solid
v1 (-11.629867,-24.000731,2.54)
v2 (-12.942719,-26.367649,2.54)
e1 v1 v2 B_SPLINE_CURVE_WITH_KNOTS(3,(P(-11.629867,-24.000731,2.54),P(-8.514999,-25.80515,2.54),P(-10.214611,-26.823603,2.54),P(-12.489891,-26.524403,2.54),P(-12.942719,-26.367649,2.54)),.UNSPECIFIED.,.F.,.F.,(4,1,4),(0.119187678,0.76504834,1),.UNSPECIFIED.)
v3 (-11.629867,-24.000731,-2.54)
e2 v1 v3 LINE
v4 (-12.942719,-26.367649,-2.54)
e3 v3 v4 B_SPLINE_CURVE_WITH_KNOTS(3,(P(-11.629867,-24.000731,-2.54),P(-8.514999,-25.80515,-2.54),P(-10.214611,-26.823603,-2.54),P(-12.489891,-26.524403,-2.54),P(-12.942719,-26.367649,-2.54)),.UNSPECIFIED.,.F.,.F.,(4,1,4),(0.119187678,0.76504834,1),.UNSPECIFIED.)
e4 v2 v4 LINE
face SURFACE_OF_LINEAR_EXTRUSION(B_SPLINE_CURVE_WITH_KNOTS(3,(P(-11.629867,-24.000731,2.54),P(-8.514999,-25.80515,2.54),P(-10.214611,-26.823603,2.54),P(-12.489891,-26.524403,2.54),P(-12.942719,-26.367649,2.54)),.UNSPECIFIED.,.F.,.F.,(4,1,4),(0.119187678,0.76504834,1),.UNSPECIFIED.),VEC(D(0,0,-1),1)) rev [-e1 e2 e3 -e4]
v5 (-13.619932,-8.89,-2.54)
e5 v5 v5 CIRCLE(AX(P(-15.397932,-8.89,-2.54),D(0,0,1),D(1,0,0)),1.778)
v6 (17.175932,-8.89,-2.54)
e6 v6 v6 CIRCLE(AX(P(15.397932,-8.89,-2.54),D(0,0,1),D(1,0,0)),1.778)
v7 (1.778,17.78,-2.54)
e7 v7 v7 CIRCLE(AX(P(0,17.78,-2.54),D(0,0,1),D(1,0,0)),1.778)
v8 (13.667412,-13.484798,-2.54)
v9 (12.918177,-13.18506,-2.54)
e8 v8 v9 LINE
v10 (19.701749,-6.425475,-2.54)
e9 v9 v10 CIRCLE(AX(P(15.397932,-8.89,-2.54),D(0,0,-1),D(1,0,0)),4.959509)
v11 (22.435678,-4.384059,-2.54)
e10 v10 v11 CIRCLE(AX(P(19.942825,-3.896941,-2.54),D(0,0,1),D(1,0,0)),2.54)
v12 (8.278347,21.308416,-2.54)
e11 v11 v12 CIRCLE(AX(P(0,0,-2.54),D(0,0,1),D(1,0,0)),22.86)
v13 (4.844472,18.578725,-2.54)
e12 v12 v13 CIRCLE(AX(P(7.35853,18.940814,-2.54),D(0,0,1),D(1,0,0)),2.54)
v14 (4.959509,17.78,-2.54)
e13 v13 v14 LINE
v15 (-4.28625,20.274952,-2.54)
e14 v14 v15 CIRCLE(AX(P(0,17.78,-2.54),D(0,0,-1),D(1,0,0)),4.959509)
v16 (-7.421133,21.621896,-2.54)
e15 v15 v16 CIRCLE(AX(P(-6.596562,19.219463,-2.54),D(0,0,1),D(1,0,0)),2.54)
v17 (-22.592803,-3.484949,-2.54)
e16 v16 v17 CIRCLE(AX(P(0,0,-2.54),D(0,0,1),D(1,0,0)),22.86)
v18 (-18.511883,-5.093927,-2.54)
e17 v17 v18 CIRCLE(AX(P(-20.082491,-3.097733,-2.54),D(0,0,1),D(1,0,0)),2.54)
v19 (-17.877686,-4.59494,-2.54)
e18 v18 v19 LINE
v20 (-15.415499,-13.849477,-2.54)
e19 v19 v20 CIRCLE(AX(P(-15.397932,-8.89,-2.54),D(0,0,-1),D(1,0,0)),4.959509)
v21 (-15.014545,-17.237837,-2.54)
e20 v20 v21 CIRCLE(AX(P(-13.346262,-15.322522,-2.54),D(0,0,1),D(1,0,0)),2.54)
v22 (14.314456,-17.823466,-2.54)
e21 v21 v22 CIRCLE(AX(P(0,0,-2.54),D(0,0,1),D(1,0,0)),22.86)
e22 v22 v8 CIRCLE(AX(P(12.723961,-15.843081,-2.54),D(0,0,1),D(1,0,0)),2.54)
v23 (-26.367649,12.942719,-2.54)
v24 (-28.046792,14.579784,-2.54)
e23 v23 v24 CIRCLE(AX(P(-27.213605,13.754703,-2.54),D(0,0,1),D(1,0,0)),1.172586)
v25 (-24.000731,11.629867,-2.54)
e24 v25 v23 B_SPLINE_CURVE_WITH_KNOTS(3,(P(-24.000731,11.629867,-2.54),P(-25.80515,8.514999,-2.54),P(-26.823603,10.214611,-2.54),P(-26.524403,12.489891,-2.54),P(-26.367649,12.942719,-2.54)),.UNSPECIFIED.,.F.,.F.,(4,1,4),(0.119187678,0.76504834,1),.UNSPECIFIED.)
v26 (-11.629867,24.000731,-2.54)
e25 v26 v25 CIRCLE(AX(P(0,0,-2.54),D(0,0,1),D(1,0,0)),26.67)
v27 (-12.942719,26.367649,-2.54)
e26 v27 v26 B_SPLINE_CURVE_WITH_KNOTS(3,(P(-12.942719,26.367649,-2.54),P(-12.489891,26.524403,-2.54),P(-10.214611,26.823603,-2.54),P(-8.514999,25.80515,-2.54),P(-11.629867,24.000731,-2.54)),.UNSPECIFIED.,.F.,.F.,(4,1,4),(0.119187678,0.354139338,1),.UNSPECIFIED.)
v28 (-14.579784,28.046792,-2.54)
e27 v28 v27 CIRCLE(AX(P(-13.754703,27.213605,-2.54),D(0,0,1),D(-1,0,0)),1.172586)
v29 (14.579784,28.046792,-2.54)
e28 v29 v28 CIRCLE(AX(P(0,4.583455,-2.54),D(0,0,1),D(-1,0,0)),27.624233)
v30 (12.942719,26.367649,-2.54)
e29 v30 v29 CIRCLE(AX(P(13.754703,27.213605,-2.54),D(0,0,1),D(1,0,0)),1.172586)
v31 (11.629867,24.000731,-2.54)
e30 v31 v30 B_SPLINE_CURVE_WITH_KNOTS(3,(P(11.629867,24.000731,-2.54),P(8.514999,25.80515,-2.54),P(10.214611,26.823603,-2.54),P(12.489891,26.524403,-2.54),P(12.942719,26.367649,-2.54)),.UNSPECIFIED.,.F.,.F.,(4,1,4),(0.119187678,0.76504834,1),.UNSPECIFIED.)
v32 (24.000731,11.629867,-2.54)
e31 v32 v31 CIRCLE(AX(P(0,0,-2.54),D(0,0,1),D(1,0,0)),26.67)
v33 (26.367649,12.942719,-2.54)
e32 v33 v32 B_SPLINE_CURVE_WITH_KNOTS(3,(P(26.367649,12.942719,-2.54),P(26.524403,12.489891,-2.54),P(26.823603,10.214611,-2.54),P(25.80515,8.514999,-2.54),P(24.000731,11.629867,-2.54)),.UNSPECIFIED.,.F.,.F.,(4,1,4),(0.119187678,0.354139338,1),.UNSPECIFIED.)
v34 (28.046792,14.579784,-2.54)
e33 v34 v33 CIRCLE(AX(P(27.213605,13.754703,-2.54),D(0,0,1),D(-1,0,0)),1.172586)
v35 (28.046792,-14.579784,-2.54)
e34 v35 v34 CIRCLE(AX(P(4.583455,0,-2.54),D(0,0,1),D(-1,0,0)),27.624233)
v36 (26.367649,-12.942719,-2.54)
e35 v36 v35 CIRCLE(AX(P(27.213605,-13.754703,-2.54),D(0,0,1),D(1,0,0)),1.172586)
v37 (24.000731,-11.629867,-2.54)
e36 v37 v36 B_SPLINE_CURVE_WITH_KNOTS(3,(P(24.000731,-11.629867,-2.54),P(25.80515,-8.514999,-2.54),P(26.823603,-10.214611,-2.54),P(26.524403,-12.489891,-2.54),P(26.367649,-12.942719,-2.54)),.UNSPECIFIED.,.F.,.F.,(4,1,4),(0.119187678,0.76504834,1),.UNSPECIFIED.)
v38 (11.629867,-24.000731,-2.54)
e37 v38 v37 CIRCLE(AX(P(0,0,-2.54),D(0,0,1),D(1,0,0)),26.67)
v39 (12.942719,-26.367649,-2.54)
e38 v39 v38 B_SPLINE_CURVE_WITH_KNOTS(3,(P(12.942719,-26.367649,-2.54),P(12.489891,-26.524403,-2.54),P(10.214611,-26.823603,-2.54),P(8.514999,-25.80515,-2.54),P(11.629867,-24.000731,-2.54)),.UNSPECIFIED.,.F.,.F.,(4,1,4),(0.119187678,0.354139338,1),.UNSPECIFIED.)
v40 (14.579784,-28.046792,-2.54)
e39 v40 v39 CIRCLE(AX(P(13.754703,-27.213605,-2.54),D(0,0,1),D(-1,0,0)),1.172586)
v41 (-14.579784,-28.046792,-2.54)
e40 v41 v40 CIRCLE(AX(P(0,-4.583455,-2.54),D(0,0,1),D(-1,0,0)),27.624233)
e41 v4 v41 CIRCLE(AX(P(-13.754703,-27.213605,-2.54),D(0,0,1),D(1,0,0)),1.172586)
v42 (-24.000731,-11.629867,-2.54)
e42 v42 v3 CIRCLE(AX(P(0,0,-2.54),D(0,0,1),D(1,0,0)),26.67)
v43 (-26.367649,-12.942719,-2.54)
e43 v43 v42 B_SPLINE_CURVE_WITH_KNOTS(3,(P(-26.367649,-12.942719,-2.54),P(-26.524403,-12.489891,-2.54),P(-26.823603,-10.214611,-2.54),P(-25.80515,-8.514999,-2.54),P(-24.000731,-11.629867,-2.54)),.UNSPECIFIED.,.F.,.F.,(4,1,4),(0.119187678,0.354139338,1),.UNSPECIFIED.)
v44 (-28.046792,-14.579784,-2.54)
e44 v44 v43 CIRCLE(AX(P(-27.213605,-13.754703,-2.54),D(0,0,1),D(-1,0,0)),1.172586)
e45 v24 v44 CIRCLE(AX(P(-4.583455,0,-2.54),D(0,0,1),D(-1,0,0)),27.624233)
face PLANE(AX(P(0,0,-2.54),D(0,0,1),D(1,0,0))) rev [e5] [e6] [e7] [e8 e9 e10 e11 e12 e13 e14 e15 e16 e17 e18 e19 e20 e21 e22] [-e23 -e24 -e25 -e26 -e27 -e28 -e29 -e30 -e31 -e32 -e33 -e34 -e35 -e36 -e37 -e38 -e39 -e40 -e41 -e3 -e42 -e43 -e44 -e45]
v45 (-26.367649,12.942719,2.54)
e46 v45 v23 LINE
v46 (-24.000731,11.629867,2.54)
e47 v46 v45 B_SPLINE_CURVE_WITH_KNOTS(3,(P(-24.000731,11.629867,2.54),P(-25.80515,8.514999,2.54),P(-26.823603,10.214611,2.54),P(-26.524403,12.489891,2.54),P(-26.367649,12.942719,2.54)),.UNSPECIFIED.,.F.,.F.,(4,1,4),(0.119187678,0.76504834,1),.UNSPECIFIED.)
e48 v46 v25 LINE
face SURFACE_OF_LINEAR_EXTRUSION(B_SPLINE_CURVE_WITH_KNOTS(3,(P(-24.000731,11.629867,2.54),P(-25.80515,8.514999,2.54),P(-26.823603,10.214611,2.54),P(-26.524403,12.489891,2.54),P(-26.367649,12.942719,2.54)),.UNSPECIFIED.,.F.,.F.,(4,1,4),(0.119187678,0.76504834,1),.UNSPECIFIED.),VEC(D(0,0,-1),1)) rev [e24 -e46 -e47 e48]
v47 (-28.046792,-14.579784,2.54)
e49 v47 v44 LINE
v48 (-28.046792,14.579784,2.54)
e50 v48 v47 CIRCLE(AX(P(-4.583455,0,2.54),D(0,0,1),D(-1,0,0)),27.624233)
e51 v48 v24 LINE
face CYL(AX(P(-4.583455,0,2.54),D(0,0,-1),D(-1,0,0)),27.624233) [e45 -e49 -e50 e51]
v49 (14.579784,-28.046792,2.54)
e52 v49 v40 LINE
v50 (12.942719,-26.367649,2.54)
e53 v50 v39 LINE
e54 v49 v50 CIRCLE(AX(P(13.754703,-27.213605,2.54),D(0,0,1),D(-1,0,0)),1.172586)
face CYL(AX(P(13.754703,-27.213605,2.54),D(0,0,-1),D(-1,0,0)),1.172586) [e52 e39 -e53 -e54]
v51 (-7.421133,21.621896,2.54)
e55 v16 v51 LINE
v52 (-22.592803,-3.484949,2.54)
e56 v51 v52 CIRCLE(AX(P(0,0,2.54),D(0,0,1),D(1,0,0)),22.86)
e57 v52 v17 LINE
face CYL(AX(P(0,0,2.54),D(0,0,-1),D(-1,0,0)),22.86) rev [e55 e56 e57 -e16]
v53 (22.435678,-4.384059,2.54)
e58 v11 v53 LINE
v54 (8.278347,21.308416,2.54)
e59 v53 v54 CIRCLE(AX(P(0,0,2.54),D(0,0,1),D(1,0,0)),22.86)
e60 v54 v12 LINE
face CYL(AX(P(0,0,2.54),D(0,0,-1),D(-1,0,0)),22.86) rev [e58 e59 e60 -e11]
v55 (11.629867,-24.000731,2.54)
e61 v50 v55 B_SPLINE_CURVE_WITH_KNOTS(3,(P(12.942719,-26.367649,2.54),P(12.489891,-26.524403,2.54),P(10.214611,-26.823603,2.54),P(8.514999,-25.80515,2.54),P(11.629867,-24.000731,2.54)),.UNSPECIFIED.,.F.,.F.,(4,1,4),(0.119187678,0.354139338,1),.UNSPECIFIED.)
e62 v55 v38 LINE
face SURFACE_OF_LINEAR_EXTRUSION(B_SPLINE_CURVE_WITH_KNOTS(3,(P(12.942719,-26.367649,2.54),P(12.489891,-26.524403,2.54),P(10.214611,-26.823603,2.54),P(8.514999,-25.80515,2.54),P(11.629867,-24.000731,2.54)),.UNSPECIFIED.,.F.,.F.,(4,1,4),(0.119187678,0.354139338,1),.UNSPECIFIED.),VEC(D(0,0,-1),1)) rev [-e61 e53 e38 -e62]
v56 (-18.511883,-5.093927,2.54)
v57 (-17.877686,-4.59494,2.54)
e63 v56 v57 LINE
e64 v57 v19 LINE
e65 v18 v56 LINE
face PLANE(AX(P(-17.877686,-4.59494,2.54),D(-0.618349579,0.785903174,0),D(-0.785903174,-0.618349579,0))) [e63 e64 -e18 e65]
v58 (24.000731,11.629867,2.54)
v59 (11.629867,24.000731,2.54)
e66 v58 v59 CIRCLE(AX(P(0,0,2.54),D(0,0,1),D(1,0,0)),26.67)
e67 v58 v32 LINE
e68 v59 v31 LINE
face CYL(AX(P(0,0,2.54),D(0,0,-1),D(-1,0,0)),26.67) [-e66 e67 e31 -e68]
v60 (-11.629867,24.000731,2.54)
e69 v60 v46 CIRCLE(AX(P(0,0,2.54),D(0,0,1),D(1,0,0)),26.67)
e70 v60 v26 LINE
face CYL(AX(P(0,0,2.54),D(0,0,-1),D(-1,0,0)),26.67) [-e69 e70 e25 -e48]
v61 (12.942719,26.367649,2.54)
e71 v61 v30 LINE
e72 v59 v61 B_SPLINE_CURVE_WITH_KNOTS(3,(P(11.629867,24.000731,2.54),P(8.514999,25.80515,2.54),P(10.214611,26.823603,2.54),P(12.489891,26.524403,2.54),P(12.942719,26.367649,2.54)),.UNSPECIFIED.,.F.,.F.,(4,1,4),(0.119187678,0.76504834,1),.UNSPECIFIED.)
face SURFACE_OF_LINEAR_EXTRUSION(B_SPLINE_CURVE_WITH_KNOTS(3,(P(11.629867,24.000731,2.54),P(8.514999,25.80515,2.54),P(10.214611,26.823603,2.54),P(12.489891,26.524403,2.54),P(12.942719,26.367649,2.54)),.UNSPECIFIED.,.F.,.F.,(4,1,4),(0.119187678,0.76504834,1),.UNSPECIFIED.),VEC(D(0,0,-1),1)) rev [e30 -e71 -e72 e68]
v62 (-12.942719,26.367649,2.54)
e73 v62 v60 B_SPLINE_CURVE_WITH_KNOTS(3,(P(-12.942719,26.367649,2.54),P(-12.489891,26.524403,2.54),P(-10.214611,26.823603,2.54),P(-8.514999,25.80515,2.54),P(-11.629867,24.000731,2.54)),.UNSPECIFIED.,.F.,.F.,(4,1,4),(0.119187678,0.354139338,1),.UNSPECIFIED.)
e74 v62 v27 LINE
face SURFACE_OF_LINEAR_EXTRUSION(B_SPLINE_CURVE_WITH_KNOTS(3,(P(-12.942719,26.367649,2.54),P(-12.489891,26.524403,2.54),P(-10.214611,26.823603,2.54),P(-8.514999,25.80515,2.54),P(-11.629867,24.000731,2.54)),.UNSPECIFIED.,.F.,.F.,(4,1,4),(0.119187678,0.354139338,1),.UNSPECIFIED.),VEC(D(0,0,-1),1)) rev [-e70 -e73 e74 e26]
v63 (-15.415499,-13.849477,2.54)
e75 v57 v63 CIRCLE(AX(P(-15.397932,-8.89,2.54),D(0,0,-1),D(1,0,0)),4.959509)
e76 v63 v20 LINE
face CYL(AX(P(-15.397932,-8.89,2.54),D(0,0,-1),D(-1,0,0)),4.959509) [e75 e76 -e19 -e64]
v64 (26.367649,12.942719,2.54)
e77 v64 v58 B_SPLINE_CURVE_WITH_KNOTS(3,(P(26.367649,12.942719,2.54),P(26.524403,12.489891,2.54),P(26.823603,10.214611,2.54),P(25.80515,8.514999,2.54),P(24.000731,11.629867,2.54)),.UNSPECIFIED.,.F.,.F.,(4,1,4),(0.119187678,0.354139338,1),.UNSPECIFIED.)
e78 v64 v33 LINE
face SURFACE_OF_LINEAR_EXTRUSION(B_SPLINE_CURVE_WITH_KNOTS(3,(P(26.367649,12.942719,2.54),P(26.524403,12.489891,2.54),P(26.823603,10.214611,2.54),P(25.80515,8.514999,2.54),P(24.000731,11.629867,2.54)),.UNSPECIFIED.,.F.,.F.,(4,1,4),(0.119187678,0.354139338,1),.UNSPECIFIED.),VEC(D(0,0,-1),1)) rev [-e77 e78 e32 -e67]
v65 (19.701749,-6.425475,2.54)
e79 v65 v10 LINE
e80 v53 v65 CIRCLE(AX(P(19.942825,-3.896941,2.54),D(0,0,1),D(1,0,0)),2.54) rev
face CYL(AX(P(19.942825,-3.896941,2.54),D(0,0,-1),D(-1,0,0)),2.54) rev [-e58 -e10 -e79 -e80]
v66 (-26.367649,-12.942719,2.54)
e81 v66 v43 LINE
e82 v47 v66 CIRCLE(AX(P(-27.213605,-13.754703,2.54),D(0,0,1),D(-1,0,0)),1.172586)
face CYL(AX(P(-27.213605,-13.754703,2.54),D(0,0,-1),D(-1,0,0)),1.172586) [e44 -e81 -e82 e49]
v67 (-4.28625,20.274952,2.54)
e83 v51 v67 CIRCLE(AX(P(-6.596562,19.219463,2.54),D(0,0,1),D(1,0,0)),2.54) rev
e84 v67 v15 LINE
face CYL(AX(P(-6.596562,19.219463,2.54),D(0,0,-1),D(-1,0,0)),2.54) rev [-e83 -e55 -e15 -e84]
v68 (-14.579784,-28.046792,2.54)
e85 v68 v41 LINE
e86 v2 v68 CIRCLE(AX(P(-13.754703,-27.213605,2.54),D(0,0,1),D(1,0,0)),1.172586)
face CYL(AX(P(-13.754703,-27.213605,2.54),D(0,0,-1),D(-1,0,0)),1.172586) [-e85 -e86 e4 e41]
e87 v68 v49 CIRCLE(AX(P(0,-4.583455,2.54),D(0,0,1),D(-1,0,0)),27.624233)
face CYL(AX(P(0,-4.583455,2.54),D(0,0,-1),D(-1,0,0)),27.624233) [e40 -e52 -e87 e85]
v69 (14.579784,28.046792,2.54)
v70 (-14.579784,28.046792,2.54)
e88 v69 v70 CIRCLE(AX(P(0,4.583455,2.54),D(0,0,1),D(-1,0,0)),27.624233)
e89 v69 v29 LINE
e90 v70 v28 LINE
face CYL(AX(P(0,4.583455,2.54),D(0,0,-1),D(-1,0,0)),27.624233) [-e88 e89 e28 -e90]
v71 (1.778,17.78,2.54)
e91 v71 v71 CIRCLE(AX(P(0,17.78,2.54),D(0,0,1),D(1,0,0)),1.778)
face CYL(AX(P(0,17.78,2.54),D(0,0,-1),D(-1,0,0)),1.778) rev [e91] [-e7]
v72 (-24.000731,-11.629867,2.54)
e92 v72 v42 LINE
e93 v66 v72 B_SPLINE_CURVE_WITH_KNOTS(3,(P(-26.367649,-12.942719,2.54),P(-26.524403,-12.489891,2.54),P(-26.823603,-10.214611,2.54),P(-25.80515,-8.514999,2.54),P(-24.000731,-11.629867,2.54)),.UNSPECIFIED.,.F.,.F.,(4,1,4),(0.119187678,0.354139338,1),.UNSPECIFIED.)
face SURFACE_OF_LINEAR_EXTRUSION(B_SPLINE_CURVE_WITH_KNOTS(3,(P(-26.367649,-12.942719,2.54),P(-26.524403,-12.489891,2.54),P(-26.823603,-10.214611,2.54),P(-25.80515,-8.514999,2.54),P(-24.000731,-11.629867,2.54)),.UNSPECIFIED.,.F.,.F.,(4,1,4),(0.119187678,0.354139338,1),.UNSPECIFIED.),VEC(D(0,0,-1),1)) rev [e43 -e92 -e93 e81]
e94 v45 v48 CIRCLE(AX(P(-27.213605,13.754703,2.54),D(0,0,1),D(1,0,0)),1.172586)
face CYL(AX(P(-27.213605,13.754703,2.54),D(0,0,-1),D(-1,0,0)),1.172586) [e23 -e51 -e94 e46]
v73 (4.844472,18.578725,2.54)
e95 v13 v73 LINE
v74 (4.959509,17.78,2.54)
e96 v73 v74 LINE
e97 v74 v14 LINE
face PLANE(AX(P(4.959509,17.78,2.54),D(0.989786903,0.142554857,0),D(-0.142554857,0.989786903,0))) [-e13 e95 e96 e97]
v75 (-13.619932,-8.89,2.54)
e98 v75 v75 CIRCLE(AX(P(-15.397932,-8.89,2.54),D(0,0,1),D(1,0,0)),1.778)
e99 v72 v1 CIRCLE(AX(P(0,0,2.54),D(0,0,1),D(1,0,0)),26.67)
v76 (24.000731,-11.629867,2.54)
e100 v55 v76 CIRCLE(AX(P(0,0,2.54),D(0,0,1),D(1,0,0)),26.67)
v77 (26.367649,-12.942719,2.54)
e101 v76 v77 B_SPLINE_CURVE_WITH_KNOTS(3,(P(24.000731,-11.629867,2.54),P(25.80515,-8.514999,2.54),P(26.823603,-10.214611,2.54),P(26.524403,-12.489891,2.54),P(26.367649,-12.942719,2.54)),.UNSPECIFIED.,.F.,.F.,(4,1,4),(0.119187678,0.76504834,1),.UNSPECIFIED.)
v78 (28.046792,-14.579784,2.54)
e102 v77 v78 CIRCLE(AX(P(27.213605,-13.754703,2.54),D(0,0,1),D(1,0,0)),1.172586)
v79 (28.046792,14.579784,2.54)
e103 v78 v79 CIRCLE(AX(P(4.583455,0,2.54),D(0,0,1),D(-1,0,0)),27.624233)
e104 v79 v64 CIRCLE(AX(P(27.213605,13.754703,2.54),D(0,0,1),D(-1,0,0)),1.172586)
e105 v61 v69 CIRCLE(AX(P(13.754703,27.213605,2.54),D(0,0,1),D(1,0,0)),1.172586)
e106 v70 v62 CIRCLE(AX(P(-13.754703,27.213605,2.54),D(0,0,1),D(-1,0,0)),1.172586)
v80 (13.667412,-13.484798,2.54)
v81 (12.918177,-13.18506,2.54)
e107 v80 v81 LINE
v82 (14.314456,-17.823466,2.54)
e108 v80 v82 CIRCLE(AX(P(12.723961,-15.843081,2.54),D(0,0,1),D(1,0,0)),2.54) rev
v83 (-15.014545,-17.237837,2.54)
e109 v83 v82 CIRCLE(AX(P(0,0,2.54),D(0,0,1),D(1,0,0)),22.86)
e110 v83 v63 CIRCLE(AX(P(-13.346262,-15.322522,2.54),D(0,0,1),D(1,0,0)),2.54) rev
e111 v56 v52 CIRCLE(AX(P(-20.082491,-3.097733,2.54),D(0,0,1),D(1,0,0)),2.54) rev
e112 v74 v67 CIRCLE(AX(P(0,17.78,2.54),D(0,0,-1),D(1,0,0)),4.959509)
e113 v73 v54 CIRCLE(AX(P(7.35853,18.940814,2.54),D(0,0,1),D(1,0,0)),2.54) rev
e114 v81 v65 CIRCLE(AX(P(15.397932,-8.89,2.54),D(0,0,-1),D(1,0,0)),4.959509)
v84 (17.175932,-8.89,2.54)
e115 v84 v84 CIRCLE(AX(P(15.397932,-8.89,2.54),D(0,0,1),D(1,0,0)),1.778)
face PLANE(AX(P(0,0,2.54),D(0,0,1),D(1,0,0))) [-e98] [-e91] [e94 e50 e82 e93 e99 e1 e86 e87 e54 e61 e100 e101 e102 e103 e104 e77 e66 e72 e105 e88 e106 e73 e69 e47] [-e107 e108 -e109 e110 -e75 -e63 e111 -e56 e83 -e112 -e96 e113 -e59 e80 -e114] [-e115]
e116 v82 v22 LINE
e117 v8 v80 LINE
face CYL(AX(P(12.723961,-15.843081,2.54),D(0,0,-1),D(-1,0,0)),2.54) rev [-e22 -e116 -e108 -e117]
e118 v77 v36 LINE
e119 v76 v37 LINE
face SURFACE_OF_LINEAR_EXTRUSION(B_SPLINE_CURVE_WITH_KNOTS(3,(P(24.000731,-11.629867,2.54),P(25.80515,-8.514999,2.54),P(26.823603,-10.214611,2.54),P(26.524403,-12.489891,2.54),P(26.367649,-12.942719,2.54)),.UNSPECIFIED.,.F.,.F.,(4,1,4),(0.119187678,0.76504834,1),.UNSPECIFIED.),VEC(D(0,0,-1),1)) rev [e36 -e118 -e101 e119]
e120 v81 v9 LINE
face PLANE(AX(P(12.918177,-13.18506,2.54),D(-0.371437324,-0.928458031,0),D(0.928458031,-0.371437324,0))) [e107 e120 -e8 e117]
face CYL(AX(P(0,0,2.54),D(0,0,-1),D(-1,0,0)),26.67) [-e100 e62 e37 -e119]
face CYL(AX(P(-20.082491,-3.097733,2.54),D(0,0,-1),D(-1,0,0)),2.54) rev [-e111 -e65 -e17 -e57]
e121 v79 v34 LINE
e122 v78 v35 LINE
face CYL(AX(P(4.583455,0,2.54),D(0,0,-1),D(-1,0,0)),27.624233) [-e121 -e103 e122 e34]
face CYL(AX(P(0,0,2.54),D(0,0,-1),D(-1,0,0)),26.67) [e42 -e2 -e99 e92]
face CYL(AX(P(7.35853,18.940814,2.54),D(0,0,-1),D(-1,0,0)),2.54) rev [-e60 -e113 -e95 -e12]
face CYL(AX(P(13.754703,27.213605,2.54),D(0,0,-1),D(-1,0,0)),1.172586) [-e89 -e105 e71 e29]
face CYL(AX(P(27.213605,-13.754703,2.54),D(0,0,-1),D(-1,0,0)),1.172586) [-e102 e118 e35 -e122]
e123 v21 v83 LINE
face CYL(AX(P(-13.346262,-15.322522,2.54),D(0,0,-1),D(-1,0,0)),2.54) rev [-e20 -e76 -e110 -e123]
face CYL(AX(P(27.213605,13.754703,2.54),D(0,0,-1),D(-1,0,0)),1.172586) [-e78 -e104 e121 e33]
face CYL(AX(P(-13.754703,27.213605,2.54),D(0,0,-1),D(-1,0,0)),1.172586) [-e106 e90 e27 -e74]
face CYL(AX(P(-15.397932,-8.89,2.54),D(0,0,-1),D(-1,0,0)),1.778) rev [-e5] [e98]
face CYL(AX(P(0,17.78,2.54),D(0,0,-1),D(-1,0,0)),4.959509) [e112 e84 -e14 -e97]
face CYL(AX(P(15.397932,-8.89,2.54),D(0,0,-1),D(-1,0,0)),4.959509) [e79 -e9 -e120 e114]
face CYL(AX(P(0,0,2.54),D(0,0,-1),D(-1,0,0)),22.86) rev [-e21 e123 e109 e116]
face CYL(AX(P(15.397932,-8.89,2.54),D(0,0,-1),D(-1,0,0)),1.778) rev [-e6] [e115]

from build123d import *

# Parameters (mm, degrees)
SKETCH1_R           = 1.778
BOSS_EXTRUDE1_DEPTH = 2.54
FILLET1_R           = 2.54


with BuildPart() as part:
    # Sketch1 → Boss-Extrude1 (new, symmetric)
    with BuildSketch(Plane.XY):
        with BuildLine():
            ThreePointArc((23.096897519, 13.335), (18.163878776, 19.528502447), (11.629866574, 24.000731311))
            add(Edge.make_bspline(
                [(12.942718979, 26.367649013), (12.489890773, 26.524403161), (10.214611, 26.823602727), (8.514999239, 25.805149786), (11.629866574, 24.000731311)],
                knots=[0.119187678, 0.119187678, 0.119187678, 0.119187678, 0.354139338, 1, 1, 1, 1], degree=3))
            ThreePointArc((12.942718979, 26.367649013), (14.594299506, 26.395047723), (14.579783558, 28.046791715))
            ThreePointArc((14.579783558, 28.046791715), (0, 32.207688222), (-14.579783558, 28.046791715))
            ThreePointArc((-14.579783558, 28.046791715), (-14.594299506, 26.395047723), (-12.942718979, 26.367649013))
            add(Edge.make_bspline(
                [(-12.942718979, 26.367649013), (-12.489890773, 26.524403161), (-10.214611, 26.823602727), (-8.514999239, 25.805149786), (-11.629866574, 24.000731311)],
                knots=[0.119187678, 0.119187678, 0.119187678, 0.119187678, 0.354139338, 1, 1, 1, 1], degree=3))
            ThreePointArc((-11.629866574, 24.000731311), (-18.163878776, 19.528502447), (-23.096897519, 13.335))
            ThreePointArc((-23.096897519, 13.335), (-23.564242622, 12.49061126), (-24.000731311, 11.629866574))
            add(Edge.make_bspline(
                [(-26.367649013, 12.942718979), (-26.524403161, 12.489890773), (-26.823602727, 10.214611), (-25.805149786, 8.514999239), (-24.000731311, 11.629866574)],
                knots=[0.119187678, 0.119187678, 0.119187678, 0.119187678, 0.354139338, 1, 1, 1, 1], degree=3))
            ThreePointArc((-26.367649013, 12.942718979), (-26.395047723, 14.594299506), (-28.046791715, 14.579783558))
            ThreePointArc((-28.046791715, 14.579783558), (-32.207688222, 0), (-28.046791715, -14.579783558))
            ThreePointArc((-28.046791715, -14.579783558), (-26.395047723, -14.594299506), (-26.367649013, -12.942718979))
            add(Edge.make_bspline(
                [(-26.367649013, -12.942718979), (-26.524403161, -12.489890773), (-26.823602727, -10.214611), (-25.805149786, -8.514999239), (-24.000731311, -11.629866574)],
                knots=[0.119187678, 0.119187678, 0.119187678, 0.119187678, 0.354139338, 1, 1, 1, 1], degree=3))
            ThreePointArc((-24.000731311, -11.629866574), (-18.858537854, -18.858537854), (-11.629866574, -24.000731311))
            add(Edge.make_bspline(
                [(-12.942718979, -26.367649013), (-12.489890773, -26.524403161), (-10.214611, -26.823602727), (-8.514999239, -25.805149786), (-11.629866574, -24.000731311)],
                knots=[0.119187678, 0.119187678, 0.119187678, 0.119187678, 0.354139338, 1, 1, 1, 1], degree=3))
            ThreePointArc((-12.942718979, -26.367649013), (-14.594299506, -26.395047723), (-14.579783558, -28.046791715))
            ThreePointArc((-14.579783558, -28.046791715), (0, -32.207688222), (14.579783558, -28.046791715))
            ThreePointArc((14.579783558, -28.046791715), (14.594299506, -26.395047723), (12.942718979, -26.367649013))
            add(Edge.make_bspline(
                [(12.942718979, -26.367649013), (12.489890773, -26.524403161), (10.214611, -26.823602727), (8.514999239, -25.805149786), (11.629866574, -24.000731311)],
                knots=[0.119187678, 0.119187678, 0.119187678, 0.119187678, 0.354139338, 1, 1, 1, 1], degree=3))
            ThreePointArc((11.629866574, -24.000731311), (18.858537854, -18.858537854), (24.000731311, -11.629866574))
            add(Edge.make_bspline(
                [(26.367649013, -12.942718979), (26.524403161, -12.489890773), (26.823602727, -10.214611), (25.805149786, -8.514999239), (24.000731311, -11.629866574)],
                knots=[0.119187678, 0.119187678, 0.119187678, 0.119187678, 0.354139338, 1, 1, 1, 1], degree=3))
            ThreePointArc((26.367649013, -12.942718979), (26.395047723, -14.594299506), (28.046791715, -14.579783558))
            ThreePointArc((28.046791715, -14.579783558), (32.207688222, 0), (28.046791715, 14.579783558))
            ThreePointArc((28.046791715, 14.579783558), (26.395047723, 14.594299506), (26.367649013, 12.942718979))
            add(Edge.make_bspline(
                [(26.367649013, 12.942718979), (26.524403161, 12.489890773), (26.823602727, 10.214611), (25.805149786, 8.514999239), (24.000731311, 11.629866574)],
                knots=[0.119187678, 0.119187678, 0.119187678, 0.119187678, 0.354139338, 1, 1, 1, 1], degree=3))
            ThreePointArc((24.000731311, 11.629866574), (23.564242622, 12.49061126), (23.096897519, 13.335))
        make_face()
        with Locations((0, 17.78)):
            Circle(SKETCH1_R, mode=Mode.SUBTRACT)
        with Locations((15.397931679, -8.89)):
            Circle(SKETCH1_R, mode=Mode.SUBTRACT)
        with Locations((-15.397931679, -8.89)):
            Circle(SKETCH1_R, mode=Mode.SUBTRACT)
        with BuildLine():
            Line((-4.28625, 20.274952091), (-4.28625, 22.454568821))
            ThreePointArc((-4.28625, 22.454568821), (-13.24349331, 18.633021359), (-19.797340731, 11.43))
            ThreePointArc((-19.797340731, 11.43), (-22.758416501, 2.152690962), (-21.58935203, -7.515283024))
            Line((-21.58935203, -7.515283024), (-17.877685951, -4.59493961))
            ThreePointArc((-17.877685951, -4.59493961), (-10.605148477, -7.614870918), (-15.415498572, -13.849477433))
            Line((-15.415498572, -13.849477433), (-17.30310203, -14.939285797))
            ThreePointArc((-17.30310203, -14.939285797), (-9.514923191, -20.78571232), (0, -22.86))
            ThreePointArc((0, -22.86), (9.514923191, -20.78571232), (17.30310203, -14.939285797))
            Line((17.30310203, -14.939285797), (12.918177407, -13.18506039))
            ThreePointArc((12.918177407, -13.18506039), (11.8972459, -5.376892533), (19.701748572, -6.425474659))
            Line((19.701748572, -6.425474659), (21.58935203, -7.515283024))
            ThreePointArc((21.58935203, -7.515283024), (22.758416501, 2.152690962), (19.797340731, 11.43))
            ThreePointArc((19.797340731, 11.43), (13.24349331, 18.633021359), (4.28625, 22.454568821))
            Line((4.28625, 22.454568821), (4.959508544, 17.78))
            ThreePointArc((4.959508544, 17.78), (-1.292097423, 12.991763451), (-4.28625, 20.274952091))
        make_face(mode=Mode.SUBTRACT)
    extrude(amount=BOSS_EXTRUDE1_DEPTH, both=True)

    # Fillet1
    # the kernel refuses this fillet: 2.54 mm, written as the material it adds along each edge
    with BuildSketch(Plane(origin=(21.58935203, -7.515283024, 0), x_dir=(-0.8660254037844372, 0.5000000000000026, 0), z_dir=(0, 0, -1)), Plane(origin=(-17.30310203, -14.939285797, 0), x_dir=(0.8660254037844382, 0.5000000000000008, 0), z_dir=(0, 0, -1)), Plane(origin=(-4.28625, 22.454568821, 0), x_dir=(0, -1, 0), z_dir=(0, 0, -1))) as fillet1_piece_1:
        with BuildLine():
            CenterArc((3.235105636, 2.310312353), FILLET1_R, 161.0565991, 84.38964425)
            Line((0.832672738, 3.134882647), (0.78462408, 3.151374053))
            ThreePointArc((0.78462408, 3.151374053), (0.311567983, 1.595269408), (-0.049899042, 0.009525))
            Line((-0.049899042, 0.009525), (0, -0.0508))
            ThreePointArc((0, -0.0508), (1.089808365, -0.0508), (2.158506952, -0.046206247))
            Line((2.158506952, -0.046206247), (2.17961673, 0))
        make_face()
    extrude(amount=2.54)
    with BuildSketch(Plane(origin=(17.30310203, -14.939285797, 0), x_dir=(-0.7195709341275718, -0.6944189447003685, 0), z_dir=(0, 0, -1)), Plane(origin=(4.28625, 22.454568821, 0), x_dir=(0.9611699140434871, -0.2759572364291899, 0), z_dir=(0, 0, -1)), Plane(origin=(-21.58935203, -7.515283024, 0), x_dir=(-0.24159897991591575, 0.9703761811295601, 0), z_dir=(0, 0, -1))) as fillet1_piece_2:
        with BuildLine():
            CenterArc((3.922629513, 2.529497521), FILLET1_R, 155.785220789, 119.426923656)
            Line((1.60611307, 3.571299597), (1.559782741, 3.592135639))
            Line((1.559782741, 3.592135639), (-0.046330329, 0.020836042))
            Line((-0.046330329, 0.020836042), (-0.004614858, -0.05058995))
            ThreePointArc((-0.004614858, -0.05058995), (2.076686213, -0.145322312), (4.157987284, -0.05058995))
            Line((4.157987284, -0.05058995), (4.153372426, 0))
        make_face()
    extrude(amount=2.54)
    with BuildSketch(Plane(origin=(-21.58935203, -7.515283024, 0), x_dir=(-0.24159897991591575, 0.9703761811295601, 0), z_dir=(0, 0, 1)), Plane(origin=(4.28625, 22.454568821, 0), x_dir=(0.9611699140434871, -0.2759572364291899, 0), z_dir=(0, 0, 1)), Plane(origin=(17.30310203, -14.939285797, 0), x_dir=(-0.7195709341275718, -0.6944189447003685, 0), z_dir=(0, 0, 1))) as fillet1_piece_3:
        with BuildLine():
            CenterArc((3.922629513, -2.529497521), FILLET1_R, 84.787855555, 119.426923656)
            Line((1.60611307, -3.571299597), (1.559782741, -3.592135639))
            Line((1.559782741, -3.592135639), (-0.046330329, -0.020836042))
            Line((-0.046330329, -0.020836042), (-0.004614858, 0.05058995))
            ThreePointArc((-0.004614858, 0.05058995), (2.076686213, 0.145322312), (4.157987284, 0.05058995))
            Line((4.157987284, 0.05058995), (4.153372426, 0))
        make_face()
    extrude(amount=2.54)
    with BuildSketch(Plane(origin=(-4.28625, 22.454568821, 0), x_dir=(0, -1, 0), z_dir=(0, 0, 1)), Plane(origin=(-17.30310203, -14.939285797, 0), x_dir=(0.8660254037844382, 0.5000000000000008, 0), z_dir=(0, 0, 1)), Plane(origin=(21.58935203, -7.515283024, 0), x_dir=(-0.8660254037844372, 0.5000000000000026, 0), z_dir=(0, 0, 1))) as fillet1_piece_4:
        with BuildLine():
            CenterArc((3.235105636, -2.310312353), FILLET1_R, 114.55375665, 84.38964425)
            Line((0.832672738, -3.134882647), (0.78462408, -3.151374053))
            ThreePointArc((0.78462408, -3.151374053), (0.311567983, -1.595269408), (-0.049899042, -0.009525))
            Line((-0.049899042, -0.009525), (0, 0.0508))
            ThreePointArc((0, 0.0508), (1.089808365, 0.0508), (2.158506952, 0.046206247))
            Line((2.158506952, 0.046206247), (2.17961673, 0))
        make_face()
    extrude(amount=2.54)


solid = part.part
